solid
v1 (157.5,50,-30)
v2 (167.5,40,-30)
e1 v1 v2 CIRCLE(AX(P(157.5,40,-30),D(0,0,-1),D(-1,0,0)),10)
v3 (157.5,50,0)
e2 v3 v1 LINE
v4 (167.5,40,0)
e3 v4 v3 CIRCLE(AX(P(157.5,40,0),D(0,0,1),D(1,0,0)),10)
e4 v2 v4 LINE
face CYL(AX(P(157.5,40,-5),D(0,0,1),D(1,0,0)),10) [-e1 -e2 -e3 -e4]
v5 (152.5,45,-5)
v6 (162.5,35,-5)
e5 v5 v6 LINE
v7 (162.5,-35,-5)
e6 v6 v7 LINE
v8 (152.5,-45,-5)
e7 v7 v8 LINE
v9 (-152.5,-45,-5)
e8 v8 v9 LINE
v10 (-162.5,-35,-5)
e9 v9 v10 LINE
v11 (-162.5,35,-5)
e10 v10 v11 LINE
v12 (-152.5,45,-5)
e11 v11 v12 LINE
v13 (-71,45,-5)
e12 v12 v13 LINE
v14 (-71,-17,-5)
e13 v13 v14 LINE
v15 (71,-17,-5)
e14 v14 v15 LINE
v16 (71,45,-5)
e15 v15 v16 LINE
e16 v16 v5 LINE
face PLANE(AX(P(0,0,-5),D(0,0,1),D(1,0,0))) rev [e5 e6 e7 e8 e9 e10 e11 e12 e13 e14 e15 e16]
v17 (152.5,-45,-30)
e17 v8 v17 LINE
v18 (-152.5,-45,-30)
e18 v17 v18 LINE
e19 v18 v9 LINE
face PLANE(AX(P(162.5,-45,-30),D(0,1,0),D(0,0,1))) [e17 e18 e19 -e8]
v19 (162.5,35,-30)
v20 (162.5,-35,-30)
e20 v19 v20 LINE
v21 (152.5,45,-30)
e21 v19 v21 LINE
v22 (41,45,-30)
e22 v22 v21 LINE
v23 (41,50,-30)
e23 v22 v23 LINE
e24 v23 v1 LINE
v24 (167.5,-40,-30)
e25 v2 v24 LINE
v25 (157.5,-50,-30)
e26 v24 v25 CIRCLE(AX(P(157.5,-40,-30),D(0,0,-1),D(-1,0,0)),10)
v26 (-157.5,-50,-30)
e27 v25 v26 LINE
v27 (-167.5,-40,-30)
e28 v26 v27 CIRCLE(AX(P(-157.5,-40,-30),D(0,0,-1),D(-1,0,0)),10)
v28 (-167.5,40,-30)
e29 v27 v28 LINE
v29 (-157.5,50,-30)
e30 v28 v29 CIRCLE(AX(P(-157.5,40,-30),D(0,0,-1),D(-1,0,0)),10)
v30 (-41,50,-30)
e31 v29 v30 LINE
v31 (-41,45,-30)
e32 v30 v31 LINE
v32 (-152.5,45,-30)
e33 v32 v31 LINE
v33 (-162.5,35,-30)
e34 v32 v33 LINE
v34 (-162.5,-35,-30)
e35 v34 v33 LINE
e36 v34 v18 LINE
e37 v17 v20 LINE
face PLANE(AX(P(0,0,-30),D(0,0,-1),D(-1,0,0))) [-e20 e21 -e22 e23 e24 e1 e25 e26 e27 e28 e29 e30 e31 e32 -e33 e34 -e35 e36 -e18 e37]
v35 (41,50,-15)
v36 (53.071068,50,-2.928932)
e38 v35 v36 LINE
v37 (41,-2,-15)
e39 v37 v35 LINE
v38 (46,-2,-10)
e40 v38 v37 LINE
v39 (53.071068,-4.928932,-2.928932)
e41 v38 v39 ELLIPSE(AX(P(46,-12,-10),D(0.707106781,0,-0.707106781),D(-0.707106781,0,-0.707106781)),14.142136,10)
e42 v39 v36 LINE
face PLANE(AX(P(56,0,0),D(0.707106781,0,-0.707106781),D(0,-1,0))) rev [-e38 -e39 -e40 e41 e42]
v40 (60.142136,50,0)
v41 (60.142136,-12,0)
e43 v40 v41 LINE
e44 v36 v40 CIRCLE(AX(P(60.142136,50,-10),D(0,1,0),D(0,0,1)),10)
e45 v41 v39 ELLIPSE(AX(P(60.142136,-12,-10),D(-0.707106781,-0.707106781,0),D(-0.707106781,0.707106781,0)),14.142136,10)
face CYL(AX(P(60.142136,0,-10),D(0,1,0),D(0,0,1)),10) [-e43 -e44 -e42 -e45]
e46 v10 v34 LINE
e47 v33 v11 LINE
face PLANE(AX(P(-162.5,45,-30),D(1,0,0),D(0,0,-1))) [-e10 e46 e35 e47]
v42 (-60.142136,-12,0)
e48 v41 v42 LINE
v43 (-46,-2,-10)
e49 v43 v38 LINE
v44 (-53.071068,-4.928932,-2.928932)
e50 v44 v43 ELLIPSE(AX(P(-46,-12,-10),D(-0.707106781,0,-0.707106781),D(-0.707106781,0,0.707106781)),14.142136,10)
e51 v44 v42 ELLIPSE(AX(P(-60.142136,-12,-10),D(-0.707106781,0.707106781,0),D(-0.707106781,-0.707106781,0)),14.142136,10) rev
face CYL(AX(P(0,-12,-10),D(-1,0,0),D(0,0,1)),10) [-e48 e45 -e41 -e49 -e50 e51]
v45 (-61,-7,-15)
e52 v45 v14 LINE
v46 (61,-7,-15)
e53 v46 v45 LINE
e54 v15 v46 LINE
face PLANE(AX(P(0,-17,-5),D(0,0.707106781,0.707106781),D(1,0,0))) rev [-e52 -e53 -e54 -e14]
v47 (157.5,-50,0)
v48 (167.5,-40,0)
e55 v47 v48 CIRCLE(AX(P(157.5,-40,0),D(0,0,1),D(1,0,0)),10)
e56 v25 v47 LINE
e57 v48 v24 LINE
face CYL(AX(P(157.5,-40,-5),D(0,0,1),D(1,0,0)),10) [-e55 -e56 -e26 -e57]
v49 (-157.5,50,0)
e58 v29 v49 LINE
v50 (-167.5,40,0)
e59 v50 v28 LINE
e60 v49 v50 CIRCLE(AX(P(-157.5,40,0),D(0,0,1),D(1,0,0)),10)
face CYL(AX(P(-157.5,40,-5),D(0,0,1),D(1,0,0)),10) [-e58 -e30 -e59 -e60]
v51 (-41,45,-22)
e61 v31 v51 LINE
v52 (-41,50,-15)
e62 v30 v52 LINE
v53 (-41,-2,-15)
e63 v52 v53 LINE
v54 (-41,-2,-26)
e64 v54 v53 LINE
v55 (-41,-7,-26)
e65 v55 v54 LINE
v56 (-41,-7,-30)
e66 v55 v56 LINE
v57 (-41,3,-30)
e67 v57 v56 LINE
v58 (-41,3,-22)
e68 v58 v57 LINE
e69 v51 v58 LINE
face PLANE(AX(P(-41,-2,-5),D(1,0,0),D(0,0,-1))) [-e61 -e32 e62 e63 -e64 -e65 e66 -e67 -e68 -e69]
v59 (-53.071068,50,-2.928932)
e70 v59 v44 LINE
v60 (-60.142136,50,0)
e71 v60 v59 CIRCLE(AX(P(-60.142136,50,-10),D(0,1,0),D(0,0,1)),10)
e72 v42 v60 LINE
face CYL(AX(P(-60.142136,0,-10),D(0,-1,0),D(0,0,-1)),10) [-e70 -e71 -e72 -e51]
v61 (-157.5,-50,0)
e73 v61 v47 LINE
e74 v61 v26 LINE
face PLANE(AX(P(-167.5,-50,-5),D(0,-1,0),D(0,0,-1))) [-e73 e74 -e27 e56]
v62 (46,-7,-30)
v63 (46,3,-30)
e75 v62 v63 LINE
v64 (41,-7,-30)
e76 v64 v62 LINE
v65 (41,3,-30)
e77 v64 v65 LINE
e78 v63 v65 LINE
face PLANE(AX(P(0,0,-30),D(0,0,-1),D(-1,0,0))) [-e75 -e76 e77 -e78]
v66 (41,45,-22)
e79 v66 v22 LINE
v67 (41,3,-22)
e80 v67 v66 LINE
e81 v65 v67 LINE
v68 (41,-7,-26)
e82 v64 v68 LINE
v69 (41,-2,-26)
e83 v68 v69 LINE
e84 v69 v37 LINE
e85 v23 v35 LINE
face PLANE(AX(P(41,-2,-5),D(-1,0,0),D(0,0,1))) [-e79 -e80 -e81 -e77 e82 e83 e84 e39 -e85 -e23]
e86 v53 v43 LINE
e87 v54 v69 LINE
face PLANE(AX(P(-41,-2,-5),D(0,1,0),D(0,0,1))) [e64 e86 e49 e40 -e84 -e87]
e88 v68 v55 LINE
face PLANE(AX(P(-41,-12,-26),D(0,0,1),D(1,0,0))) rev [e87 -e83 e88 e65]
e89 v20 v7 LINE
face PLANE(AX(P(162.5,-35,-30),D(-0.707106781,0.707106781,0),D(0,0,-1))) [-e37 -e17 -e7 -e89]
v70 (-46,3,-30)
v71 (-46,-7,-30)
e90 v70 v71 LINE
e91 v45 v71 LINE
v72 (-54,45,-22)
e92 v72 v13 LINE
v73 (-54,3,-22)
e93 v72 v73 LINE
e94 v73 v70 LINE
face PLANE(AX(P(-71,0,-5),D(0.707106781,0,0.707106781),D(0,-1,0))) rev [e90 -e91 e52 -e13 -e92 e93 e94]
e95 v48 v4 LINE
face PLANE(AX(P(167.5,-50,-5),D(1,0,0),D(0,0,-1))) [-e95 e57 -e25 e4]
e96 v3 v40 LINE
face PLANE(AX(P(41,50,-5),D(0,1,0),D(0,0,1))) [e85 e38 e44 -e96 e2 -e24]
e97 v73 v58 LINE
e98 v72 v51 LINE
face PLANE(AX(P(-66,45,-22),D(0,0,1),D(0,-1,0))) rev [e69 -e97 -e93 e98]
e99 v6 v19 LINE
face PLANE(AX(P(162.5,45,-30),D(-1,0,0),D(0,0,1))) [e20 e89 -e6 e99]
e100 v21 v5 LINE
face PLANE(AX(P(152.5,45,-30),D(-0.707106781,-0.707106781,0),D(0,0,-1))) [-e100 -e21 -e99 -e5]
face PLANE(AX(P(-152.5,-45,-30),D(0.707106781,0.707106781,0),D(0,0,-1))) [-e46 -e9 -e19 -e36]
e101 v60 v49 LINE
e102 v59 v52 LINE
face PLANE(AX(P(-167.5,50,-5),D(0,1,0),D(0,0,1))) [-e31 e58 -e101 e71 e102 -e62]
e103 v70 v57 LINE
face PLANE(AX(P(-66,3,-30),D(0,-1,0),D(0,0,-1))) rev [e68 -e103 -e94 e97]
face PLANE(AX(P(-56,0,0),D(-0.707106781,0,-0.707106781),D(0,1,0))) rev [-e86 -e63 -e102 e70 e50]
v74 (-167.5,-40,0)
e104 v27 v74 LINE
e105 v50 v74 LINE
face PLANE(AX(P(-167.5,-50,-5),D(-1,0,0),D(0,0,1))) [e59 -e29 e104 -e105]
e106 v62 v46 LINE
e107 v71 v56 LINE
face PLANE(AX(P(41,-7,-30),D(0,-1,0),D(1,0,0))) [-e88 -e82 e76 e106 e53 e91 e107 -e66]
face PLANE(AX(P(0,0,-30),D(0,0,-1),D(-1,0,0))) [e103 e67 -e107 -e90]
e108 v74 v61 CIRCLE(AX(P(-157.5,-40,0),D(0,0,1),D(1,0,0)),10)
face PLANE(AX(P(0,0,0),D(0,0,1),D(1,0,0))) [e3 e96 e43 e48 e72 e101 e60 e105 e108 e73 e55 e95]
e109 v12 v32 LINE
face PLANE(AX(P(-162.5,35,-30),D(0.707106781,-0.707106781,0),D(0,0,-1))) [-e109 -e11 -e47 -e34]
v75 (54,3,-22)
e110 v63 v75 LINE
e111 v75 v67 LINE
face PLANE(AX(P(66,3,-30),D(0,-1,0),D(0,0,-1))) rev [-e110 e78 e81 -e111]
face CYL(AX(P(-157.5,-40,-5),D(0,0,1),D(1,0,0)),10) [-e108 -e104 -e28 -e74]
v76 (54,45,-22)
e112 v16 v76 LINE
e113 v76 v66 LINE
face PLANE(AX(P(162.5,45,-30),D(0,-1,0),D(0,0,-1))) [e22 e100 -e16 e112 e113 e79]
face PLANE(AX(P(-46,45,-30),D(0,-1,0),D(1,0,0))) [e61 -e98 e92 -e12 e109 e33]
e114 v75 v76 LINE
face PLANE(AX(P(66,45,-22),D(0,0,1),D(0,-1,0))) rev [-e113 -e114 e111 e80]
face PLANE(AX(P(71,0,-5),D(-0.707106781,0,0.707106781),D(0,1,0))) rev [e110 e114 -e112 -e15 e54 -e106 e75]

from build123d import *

# Parameters (mm, degrees)
BOSS_EXTRUDE1_DEPTH = 5
BOSS_EXTRUDE2_DEPTH = 25
FILLET1_R           = 10
CHAMFER3_SIZE       = 25
CHAMFER4_SIZE       = 15
SKETCH3_W           = 8
SKETCH3_H           = 42
CUT_EXTRUDE1_DEPTH  = 25
SKETCH4_W           = 8
SKETCH4_H           = 42
CUT_EXTRUDE2_DEPTH  = 25
FILLET2_R           = 10
SKETCH5_W           = 82
SKETCH5_H           = 4
CUT_EXTRUDE3_DEPTH  = 10
CHAMFER5_SIZE       = 10
CHAMFER6_SIZE       = 10


with BuildPart() as part:
    # Sketch1 → Boss-Extrude1 (new body)
    with BuildSketch(Plane.XY):
        Polygon((-167.5, -50), (167.5, -50), (167.5, 50), (41, 50), (41, -2), (-41, -2), (-41, 50), (-167.5, 50), align=None)
    extrude(amount=-BOSS_EXTRUDE1_DEPTH)

    # Sketch2 → Boss-Extrude2 (add)
    with BuildSketch(Plane(origin=(0, 0, -5), x_dir=(-1, 0, 0), z_dir=(0, 0, -1))):
        Polygon((-167.5, 50), (-162.5, 50), (-41, 50), (-41, 45), (-41, -2), (41, -2), (41, 45), (41, 50), (162.5, 50), (167.5, 50), (167.5, -50), (162.5, -50), (-162.5, -50), (-167.5, -50), align=None)
        Polygon((-162.5, 45), (-162.5, -45), (162.5, -45), (162.5, 45), (46, 45), (46, -7), (41, -7), (-41, -7), (-46, -7), (-46, 45), align=None, mode=Mode.SUBTRACT)
    extrude(amount=BOSS_EXTRUDE2_DEPTH)

    # Fillet1
    fillet1_edges = [part.edges().sort_by_distance(p)[0] for p in [
        (167.5, 50, -15),
        (167.5, -50, -15),
        (-167.5, -50, -15),
        (-167.5, 50, -15),
    ]]
    fillet(fillet1_edges, radius=FILLET1_R)

    # Chamfer3
    chamfer3_edges = [part.edges().sort_by_distance(p)[0] for p in [
        (-46, 19, -5),
        (46, 19, -5),
    ]]
    chamfer(chamfer3_edges, length=CHAMFER3_SIZE - 0.0001)  # a hair under: the kernel refuses the full size

    # Chamfer4
    chamfer4_edges = [part.edges().sort_by_distance(p)[0] for p in [
        (-41, 24, 0),
        (41, 24, 0),
    ]]
    chamfer(chamfer4_edges, length=CHAMFER4_SIZE)

    # Sketch3 → Cut-Extrude1 (cut)
    with BuildSketch(Plane(origin=(-41, 0, 0), x_dir=(0, 0, -1), z_dir=(1, 0, 0))):
        with Locations((26, 24)):
            Rectangle(SKETCH3_W, SKETCH3_H)
    extrude(amount=-CUT_EXTRUDE1_DEPTH, mode=Mode.SUBTRACT)

    # Sketch4 → Cut-Extrude2 (cut)
    with BuildSketch(Plane.ZY.offset(-41)):
        with Locations((-26, 24)):
            Rectangle(SKETCH4_W, SKETCH4_H)
    extrude(amount=-CUT_EXTRUDE2_DEPTH, mode=Mode.SUBTRACT)

    # Fillet2
    fillet2_edges = [part.edges().sort_by_distance(p)[0] for p in [
        (0, -2, 0),
        (-56, 24, 0),
        (56, 24, 0),
    ]]
    fillet(fillet2_edges, radius=FILLET2_R)

    # Sketch5 → Cut-Extrude3 (cut)
    with BuildSketch(Plane(origin=(0, -2, 0), x_dir=(1, 0, 0), z_dir=(0, 1, 0))):
        with Locations((0, 28)):
            Rectangle(SKETCH5_W, SKETCH5_H)
    extrude(amount=-CUT_EXTRUDE3_DEPTH, mode=Mode.SUBTRACT)

    # Chamfer5
    chamfer5_edges = [part.edges().sort_by_distance(p)[0] for p in [
        (162.5, 45, -17.5),
        (162.5, -45, -17.5),
        (-162.5, -45, -17.5),
        (-162.5, 45, -17.5),
    ]]
    chamfer(chamfer5_edges, length=CHAMFER5_SIZE)

    # Chamfer6
    chamfer6_edges = [part.edges().sort_by_distance(p)[0] for p in [
        (0, -7, -5),
    ]]
    chamfer(chamfer6_edges, length=CHAMFER6_SIZE)


solid = part.part
